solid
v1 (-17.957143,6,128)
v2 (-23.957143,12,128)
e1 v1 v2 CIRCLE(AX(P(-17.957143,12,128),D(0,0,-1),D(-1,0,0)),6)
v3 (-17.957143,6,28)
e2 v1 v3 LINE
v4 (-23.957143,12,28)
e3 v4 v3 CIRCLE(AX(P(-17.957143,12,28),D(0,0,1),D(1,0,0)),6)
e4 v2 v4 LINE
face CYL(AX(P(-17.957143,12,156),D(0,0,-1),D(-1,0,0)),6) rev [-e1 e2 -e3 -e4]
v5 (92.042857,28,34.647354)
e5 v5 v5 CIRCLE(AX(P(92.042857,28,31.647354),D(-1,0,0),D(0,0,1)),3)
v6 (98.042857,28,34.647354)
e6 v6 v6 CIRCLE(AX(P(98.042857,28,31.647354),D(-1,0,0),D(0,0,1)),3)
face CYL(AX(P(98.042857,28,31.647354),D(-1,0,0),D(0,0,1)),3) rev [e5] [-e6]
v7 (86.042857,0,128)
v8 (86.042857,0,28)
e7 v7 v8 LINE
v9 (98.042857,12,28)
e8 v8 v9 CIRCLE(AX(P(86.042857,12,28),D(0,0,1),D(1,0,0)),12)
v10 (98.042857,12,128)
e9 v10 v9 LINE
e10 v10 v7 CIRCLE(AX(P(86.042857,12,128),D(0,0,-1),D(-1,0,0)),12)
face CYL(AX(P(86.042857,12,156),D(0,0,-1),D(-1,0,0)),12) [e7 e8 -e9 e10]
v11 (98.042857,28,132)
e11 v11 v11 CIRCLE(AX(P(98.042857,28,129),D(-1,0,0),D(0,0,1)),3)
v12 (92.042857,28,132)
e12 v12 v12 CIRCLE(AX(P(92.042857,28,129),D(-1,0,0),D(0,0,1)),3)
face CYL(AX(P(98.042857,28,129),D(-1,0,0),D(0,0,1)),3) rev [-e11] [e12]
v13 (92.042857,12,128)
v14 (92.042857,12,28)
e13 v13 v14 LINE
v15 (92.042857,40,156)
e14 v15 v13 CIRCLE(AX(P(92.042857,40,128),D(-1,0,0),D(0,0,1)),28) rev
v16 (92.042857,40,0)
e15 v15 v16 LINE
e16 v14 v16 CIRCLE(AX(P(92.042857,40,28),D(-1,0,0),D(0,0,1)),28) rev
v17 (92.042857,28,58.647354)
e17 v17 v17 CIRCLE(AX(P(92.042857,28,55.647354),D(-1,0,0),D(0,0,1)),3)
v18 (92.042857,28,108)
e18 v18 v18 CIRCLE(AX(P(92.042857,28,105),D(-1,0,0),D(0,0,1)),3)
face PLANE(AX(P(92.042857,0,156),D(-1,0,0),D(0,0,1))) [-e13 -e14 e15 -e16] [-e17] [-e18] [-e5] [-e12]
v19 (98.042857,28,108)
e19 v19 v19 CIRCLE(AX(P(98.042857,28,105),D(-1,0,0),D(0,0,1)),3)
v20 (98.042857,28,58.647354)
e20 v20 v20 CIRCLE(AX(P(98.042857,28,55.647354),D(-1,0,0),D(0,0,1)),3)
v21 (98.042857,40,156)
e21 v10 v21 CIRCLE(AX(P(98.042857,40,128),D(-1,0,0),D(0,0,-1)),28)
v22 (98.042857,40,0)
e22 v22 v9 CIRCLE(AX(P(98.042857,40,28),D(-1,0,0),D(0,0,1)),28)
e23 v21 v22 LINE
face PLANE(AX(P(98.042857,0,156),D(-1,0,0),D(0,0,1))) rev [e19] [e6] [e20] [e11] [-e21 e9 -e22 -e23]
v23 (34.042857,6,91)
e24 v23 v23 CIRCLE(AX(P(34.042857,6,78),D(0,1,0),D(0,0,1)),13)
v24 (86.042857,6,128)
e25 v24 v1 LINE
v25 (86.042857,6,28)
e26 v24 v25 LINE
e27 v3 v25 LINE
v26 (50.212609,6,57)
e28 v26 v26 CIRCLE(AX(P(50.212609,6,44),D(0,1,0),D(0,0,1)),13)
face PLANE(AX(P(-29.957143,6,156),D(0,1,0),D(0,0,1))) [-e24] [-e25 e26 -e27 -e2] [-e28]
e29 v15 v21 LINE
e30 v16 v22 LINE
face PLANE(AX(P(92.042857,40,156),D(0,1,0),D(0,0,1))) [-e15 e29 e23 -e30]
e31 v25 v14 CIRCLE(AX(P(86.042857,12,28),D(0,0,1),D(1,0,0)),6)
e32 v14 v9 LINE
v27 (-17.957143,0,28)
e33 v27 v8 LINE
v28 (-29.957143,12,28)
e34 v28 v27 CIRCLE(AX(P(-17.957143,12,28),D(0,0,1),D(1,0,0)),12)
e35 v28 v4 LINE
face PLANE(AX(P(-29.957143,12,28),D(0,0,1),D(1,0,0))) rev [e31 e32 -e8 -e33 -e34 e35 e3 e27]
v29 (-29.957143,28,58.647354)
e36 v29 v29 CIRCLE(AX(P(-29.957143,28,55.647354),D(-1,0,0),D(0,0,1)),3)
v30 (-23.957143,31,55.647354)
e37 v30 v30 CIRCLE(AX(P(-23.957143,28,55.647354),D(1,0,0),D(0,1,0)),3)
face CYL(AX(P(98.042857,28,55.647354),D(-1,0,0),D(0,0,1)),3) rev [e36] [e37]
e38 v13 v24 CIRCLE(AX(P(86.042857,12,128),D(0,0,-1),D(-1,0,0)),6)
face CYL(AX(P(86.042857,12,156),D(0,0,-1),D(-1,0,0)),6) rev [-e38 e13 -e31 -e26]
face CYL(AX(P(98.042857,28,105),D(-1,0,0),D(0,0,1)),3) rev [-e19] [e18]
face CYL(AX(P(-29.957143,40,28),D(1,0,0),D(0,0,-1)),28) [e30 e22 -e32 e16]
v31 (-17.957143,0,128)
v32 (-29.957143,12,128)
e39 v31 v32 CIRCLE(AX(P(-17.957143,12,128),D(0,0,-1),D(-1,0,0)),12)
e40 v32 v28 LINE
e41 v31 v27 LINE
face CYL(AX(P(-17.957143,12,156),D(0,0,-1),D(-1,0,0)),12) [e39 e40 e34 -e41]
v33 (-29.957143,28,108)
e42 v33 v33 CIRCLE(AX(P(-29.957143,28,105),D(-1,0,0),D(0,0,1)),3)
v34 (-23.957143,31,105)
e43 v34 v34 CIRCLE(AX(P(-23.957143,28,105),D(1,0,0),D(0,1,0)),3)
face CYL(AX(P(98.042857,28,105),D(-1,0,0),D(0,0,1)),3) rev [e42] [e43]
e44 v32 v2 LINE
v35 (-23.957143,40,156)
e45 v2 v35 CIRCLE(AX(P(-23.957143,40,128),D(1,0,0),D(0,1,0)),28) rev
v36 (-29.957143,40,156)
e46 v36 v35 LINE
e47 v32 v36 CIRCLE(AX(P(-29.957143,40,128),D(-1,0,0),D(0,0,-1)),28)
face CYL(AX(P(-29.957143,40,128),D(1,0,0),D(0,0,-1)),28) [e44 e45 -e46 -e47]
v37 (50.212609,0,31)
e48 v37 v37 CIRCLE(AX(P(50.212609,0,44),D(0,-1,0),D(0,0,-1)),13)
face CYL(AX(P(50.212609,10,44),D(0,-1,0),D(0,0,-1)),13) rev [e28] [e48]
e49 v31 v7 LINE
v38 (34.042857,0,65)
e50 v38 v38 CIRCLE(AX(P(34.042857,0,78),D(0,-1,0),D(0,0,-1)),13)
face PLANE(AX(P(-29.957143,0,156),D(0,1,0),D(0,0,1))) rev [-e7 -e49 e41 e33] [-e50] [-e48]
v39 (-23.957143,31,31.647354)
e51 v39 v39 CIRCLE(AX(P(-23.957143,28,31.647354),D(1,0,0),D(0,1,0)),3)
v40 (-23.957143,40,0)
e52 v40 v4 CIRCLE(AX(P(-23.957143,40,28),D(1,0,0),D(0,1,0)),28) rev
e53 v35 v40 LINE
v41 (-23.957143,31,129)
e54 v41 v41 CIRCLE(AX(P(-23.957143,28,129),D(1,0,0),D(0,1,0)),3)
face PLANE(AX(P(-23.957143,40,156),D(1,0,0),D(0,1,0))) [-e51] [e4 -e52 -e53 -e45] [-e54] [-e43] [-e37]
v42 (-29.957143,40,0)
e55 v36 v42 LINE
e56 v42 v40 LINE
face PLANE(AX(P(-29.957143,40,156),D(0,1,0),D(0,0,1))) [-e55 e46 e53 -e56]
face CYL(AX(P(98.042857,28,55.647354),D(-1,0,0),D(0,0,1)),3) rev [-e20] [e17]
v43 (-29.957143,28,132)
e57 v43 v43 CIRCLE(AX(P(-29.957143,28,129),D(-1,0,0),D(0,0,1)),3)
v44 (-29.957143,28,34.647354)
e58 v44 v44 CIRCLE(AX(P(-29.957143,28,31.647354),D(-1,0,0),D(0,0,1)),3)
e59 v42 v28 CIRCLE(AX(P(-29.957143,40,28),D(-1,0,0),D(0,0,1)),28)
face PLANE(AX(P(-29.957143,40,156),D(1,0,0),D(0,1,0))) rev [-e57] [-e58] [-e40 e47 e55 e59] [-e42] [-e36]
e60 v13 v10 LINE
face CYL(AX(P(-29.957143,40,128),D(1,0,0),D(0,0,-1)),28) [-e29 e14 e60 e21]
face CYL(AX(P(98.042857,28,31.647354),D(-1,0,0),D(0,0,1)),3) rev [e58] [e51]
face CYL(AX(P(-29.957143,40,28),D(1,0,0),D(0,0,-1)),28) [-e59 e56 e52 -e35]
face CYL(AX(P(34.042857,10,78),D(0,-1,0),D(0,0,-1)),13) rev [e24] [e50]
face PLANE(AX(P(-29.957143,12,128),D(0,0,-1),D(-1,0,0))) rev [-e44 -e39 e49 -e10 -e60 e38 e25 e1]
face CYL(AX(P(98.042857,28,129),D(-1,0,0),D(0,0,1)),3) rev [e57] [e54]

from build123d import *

# Parameters (mm, degrees)
BASE_FLANGE1_DEPTH      = 156
CUT_EXTRUDE1_DEPTH      = 206.71825393
SKETCH6_R               = 13
CUT_EXTRUDE2_DEPTH      = 10
CUT_EXTRUDE3_DEPTH      = 203.039600079
CUT_EXTRUDE3_DEPTH_BACK = 203.039600079
SKETCH7_R               = 3


# Sheet-metal steps are written as plain solids
with BuildPart() as part:
    # Sketch2 → Base-Flange1 (new body)
    with BuildSketch(Plane.XY):
        with BuildLine():
            Line((-29.957142857, 40), (-29.957142857, 12))
            ThreePointArc((-29.957142857, 12), (-26.442424231, 3.514718626), (-17.957142857, 0))
            Line((-17.957142857, 0), (86.042857143, 0))
            ThreePointArc((86.042857143, 0), (94.528138517, 3.514718626), (98.042857143, 12))
            Line((98.042857143, 12), (98.042857143, 40))
            Line((98.042857143, 40), (92.042857143, 40))
            Line((92.042857143, 40), (92.042857143, 12))
            ThreePointArc((92.042857143, 12), (90.28549783, 7.757359313), (86.042857143, 6))
            Line((86.042857143, 6), (-17.957142857, 6))
            ThreePointArc((-17.957142857, 6), (-22.199783544, 7.757359313), (-23.957142857, 12))
            Line((-23.957142857, 12), (-23.957142857, 40))
            Line((-23.957142857, 40), (-29.957142857, 40))
        make_face()
    extrude(amount=BASE_FLANGE1_DEPTH)

    # Sketch5 → Cut-Extrude1 (cut, through all)
    with BuildSketch(Plane(origin=(98.042857143, 0, 0), x_dir=(0, 0, -1), z_dir=(1, 0, 0))):
        with BuildLine():
            Line((-128, 12), (-128, 0))
            Line((-128, 0), (-156, 0))
            Line((-156, 0), (-156, 40))
            ThreePointArc((-156, 40), (-147.798989873, 20.201010127), (-128, 12))
        make_face()
        with BuildLine():
            Line((0, 0), (0, 40))
            ThreePointArc((0, 40), (-8.201010127, 20.201010127), (-28, 12))
            Line((-28, 12), (-28, 0))
            Line((-28, 0), (0, 0))
        make_face()
    extrude(amount=-CUT_EXTRUDE1_DEPTH, mode=Mode.SUBTRACT)

    # Sketch6 → Cut-Extrude2 (cut)
    with BuildSketch(Plane.XZ):
        with Locations(Location((34.042857143, 78, 0), (0, 0, 270))):
            Circle(SKETCH6_R)
        with Locations(Location((50.212608526, 44, 0), (0, 0, 270))):
            Circle(SKETCH6_R)
    extrude(amount=-CUT_EXTRUDE2_DEPTH, mode=Mode.SUBTRACT)

    # Sketch7 → Cut-Extrude3 (cut, two sides: drawn at the far end of the back side and taken through both)
    with BuildSketch(Plane.ZY.offset(-92.042857143).offset(-CUT_EXTRUDE3_DEPTH_BACK)):
        with Locations((31.647353532, 28)):
            Circle(SKETCH7_R)
        with Locations((55.647353532, 28)):
            Circle(SKETCH7_R)
        with Locations((105, 28)):
            Circle(SKETCH7_R)
        with Locations((129, 28)):
            Circle(SKETCH7_R)
    extrude(amount=CUT_EXTRUDE3_DEPTH + CUT_EXTRUDE3_DEPTH_BACK, mode=Mode.SUBTRACT)


solid = part.part
